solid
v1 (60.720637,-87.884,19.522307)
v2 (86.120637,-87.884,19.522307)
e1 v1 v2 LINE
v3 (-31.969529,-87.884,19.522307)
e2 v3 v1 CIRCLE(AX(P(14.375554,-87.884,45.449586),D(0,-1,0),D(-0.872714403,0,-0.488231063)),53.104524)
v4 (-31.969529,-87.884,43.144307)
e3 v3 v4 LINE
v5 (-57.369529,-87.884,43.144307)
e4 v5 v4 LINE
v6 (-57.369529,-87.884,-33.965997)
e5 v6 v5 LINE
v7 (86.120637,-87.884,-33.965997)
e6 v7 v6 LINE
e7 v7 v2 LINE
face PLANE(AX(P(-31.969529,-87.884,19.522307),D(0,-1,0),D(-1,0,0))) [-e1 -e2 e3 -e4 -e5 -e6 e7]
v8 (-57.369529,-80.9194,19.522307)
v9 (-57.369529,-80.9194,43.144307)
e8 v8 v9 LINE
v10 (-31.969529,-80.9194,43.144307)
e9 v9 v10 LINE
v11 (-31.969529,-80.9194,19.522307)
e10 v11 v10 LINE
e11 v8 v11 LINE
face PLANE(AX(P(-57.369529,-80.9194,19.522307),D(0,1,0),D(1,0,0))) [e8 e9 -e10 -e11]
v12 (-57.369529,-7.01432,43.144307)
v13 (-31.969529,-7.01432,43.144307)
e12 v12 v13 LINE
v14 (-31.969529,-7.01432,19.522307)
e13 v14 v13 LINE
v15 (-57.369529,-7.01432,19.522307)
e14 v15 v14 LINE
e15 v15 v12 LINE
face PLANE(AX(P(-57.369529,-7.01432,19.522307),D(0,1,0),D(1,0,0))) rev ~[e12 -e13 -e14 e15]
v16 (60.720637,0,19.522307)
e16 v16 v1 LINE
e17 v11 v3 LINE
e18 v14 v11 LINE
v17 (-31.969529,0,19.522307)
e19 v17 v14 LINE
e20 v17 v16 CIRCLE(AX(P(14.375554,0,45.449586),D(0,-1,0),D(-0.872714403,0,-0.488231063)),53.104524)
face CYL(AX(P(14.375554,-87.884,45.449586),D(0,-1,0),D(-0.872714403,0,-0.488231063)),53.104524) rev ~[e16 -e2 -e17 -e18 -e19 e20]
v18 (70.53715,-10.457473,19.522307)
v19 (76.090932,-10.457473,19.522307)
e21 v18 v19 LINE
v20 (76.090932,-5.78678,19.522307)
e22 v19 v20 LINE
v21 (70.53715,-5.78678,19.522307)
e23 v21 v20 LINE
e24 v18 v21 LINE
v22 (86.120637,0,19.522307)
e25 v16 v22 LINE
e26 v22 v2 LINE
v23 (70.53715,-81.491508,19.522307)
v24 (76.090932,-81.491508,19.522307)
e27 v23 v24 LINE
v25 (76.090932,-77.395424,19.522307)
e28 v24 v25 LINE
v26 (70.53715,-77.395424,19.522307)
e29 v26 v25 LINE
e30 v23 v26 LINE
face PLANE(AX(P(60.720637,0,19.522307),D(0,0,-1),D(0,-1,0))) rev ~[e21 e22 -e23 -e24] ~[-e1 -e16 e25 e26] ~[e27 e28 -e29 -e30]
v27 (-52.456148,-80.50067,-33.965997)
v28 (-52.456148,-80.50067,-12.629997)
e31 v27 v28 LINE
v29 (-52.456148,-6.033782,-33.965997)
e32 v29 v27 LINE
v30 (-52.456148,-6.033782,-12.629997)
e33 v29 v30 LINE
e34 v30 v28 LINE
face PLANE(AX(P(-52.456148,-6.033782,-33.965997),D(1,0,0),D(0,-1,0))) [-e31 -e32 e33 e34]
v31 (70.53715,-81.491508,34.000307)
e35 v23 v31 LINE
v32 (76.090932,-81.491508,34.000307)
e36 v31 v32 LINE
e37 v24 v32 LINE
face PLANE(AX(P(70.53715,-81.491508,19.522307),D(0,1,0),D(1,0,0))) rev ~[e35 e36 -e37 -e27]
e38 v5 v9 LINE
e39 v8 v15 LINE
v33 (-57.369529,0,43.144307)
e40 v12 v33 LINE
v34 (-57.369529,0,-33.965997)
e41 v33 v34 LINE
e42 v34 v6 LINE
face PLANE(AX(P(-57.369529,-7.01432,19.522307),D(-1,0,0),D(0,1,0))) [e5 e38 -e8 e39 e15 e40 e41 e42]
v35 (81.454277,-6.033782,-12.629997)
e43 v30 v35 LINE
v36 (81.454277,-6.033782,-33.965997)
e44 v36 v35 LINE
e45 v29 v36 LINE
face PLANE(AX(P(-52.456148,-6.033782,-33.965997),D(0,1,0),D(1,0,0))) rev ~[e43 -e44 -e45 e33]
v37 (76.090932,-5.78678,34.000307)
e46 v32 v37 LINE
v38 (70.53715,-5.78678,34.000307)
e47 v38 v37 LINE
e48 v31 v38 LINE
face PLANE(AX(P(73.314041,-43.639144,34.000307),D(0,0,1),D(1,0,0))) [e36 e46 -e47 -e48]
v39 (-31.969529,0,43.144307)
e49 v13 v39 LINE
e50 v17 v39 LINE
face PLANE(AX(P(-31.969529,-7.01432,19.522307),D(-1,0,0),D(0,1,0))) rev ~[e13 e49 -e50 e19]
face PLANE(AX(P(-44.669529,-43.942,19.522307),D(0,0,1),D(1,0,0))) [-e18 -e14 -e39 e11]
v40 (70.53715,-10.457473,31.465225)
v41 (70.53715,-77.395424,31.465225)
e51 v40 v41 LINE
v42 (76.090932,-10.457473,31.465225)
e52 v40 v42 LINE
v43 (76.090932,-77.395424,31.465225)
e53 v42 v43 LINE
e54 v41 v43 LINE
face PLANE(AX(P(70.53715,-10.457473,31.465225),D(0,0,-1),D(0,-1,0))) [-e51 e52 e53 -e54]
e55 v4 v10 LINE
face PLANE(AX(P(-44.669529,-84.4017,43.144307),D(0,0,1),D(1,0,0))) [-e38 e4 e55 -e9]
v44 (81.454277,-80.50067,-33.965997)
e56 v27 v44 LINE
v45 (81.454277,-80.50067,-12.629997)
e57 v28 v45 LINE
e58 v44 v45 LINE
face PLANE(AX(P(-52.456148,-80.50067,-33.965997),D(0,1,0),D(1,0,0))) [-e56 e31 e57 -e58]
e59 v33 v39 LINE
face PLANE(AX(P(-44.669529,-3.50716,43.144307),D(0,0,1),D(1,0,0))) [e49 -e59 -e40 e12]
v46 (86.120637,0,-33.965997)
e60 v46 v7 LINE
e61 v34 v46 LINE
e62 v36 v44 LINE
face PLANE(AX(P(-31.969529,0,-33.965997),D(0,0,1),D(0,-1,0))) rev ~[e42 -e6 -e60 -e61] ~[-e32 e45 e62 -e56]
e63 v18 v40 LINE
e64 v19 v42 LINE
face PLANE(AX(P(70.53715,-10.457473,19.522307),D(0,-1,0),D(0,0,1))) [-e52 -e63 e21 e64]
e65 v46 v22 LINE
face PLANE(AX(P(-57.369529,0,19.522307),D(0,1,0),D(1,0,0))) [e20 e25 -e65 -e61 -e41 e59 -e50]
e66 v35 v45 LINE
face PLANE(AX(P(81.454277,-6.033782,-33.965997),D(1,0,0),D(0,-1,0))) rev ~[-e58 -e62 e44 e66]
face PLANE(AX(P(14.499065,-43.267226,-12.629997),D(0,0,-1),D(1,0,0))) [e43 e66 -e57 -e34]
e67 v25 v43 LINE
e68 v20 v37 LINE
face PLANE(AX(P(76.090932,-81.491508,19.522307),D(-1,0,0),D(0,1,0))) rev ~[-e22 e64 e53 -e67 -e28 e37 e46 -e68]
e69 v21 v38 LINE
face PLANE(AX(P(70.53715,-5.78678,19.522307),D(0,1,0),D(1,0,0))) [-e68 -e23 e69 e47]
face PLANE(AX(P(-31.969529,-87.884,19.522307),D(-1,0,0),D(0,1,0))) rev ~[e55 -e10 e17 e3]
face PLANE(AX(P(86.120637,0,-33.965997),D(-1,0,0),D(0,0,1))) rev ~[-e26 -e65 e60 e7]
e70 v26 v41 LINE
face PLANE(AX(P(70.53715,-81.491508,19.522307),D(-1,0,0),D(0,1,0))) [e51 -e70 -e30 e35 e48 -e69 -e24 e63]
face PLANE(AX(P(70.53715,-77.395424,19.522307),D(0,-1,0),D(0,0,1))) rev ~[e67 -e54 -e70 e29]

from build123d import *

# Parameters (mm, degrees)
F0_W      = 92.690166086
F0_H      = 53.4883048385
F1_DEPTH  = 87.884
F3_DEPTH  = 162.814
F4_DEPTH  = 25.4
F5_DEPTH  = 25.4
F6_W      = 5.5537819862
F6_H      = 75.7047273219
F7_DEPTH  = 14.478
F8_W      = 66.9379513711
F8_H      = 11.9429174811
F9_DEPTH  = 64.262
F10_W     = 133.9104250073
F10_H     = 74.4668878615
F11_DEPTH = 21.336
F12_DEPTH = 25.4
F13_W     = 25.4
F13_H     = 87.884
F14_DEPTH = 25.4
F15_W     = 25.4
F15_H     = 7.0143197663
F15_H_2   = 6.9646001425
F16_DEPTH = 42.418
F17_DEPTH = 18.796


with BuildPart() as f1:
    # F0 (on Front) → F1 (new body)
    with BuildSketch(Plane.XZ):
        with Locations((14.3755543977, -7.2218449786)):
            Rectangle(F0_W, F0_H)
    extrude(amount=F1_DEPTH)

    # F2 (on face) → F3 (cut)
    with BuildSketch(Plane.XZ.offset(87.884)):
        with BuildLine():
            Line((60.7206374407, 19.5223074406), (-31.9695286453, 19.5223074406))
            ThreePointArc((-31.9695286453, 19.5223074406), (14.3755543977, -7.6549383903), (60.7206374407, 19.5223074406))
        make_face()
    extrude(amount=-F3_DEPTH, mode=Mode.SUBTRACT)

    # F4 (add): a face of the model
    f4_faces = [f1.faces().sort_by_distance(p)[0] for p in [
        (60.7206374407, -43.942, -7.2218449786),
    ]]
    extrude(f4_faces, amount=F4_DEPTH)

    # F5 (add): a face of the model
    f5_faces = [f1.faces().sort_by_distance(p)[0] for p in [
        (-31.9695286453, -43.942, -7.2218449786),
    ]]
    extrude(f5_faces, amount=F5_DEPTH)

    # F6 (on face) → F7 (join)
    with BuildSketch(Plane.XY.offset(19.5223074406)):
        with Locations((73.3140408993, -43.6391439289)):
            Rectangle(F6_W, F6_H)
    extrude(amount=F7_DEPTH)

    # F8 (on face) → F9 (cut)
    with BuildSketch(Plane(origin=(70.5371499062, 0, 0), x_dir=(0, -1, 0), z_dir=(-1, 0, 0))):
        with Locations((43.9264485613, 25.4937661812)):
            Rectangle(F8_W, F8_H)
    extrude(amount=-F9_DEPTH, mode=Mode.SUBTRACT)

    # F10 (on face) → F11 (cut)
    with BuildSketch(Plane(origin=(0, 0, -33.9659973979), x_dir=(1, 0, 0), z_dir=(0, 0, -1))):
        with Locations((14.4990645349, 43.2672258466)):
            Rectangle(F10_W, F10_H)
    extrude(amount=-F11_DEPTH, mode=Mode.SUBTRACT)

    # F12 (add): a face of the model
    f12_faces = [f1.faces().sort_by_distance(p)[0] for p in [
        (-44.6695286453, -43.942, 19.5223074406),
    ]]
    extrude(f12_faces, amount=F12_DEPTH)

    # F13 (on face) → F14 (cut)
    with BuildSketch(Plane.XY.offset(44.9223074406)):
        with Locations((-44.6695286453, -43.942)):
            Rectangle(F13_W, F13_H)
    extrude(amount=-F14_DEPTH, mode=Mode.SUBTRACT)

    # F15 (on face) → F16 (join)
    with BuildSketch(Plane.XY.offset(19.5223074406)):
        with Locations((-44.6695286453, -3.5071598832)):
            Rectangle(F15_W, F15_H)
        with Locations((-44.6695286453, -84.4016999288)):
            Rectangle(F15_W, F15_H_2)
    extrude(amount=F16_DEPTH)

    # F17 (cut): faces of the model
    f17_faces = [f1.faces().sort_by_distance(p)[0] for p in [
        (-44.6695286453, -84.4016999288, 61.9403074406),
        (-44.6695286453, -3.5071598832, 61.9403074406),
    ]]
    extrude(f17_faces, amount=-F17_DEPTH, mode=Mode.SUBTRACT)


solid = f1.part
